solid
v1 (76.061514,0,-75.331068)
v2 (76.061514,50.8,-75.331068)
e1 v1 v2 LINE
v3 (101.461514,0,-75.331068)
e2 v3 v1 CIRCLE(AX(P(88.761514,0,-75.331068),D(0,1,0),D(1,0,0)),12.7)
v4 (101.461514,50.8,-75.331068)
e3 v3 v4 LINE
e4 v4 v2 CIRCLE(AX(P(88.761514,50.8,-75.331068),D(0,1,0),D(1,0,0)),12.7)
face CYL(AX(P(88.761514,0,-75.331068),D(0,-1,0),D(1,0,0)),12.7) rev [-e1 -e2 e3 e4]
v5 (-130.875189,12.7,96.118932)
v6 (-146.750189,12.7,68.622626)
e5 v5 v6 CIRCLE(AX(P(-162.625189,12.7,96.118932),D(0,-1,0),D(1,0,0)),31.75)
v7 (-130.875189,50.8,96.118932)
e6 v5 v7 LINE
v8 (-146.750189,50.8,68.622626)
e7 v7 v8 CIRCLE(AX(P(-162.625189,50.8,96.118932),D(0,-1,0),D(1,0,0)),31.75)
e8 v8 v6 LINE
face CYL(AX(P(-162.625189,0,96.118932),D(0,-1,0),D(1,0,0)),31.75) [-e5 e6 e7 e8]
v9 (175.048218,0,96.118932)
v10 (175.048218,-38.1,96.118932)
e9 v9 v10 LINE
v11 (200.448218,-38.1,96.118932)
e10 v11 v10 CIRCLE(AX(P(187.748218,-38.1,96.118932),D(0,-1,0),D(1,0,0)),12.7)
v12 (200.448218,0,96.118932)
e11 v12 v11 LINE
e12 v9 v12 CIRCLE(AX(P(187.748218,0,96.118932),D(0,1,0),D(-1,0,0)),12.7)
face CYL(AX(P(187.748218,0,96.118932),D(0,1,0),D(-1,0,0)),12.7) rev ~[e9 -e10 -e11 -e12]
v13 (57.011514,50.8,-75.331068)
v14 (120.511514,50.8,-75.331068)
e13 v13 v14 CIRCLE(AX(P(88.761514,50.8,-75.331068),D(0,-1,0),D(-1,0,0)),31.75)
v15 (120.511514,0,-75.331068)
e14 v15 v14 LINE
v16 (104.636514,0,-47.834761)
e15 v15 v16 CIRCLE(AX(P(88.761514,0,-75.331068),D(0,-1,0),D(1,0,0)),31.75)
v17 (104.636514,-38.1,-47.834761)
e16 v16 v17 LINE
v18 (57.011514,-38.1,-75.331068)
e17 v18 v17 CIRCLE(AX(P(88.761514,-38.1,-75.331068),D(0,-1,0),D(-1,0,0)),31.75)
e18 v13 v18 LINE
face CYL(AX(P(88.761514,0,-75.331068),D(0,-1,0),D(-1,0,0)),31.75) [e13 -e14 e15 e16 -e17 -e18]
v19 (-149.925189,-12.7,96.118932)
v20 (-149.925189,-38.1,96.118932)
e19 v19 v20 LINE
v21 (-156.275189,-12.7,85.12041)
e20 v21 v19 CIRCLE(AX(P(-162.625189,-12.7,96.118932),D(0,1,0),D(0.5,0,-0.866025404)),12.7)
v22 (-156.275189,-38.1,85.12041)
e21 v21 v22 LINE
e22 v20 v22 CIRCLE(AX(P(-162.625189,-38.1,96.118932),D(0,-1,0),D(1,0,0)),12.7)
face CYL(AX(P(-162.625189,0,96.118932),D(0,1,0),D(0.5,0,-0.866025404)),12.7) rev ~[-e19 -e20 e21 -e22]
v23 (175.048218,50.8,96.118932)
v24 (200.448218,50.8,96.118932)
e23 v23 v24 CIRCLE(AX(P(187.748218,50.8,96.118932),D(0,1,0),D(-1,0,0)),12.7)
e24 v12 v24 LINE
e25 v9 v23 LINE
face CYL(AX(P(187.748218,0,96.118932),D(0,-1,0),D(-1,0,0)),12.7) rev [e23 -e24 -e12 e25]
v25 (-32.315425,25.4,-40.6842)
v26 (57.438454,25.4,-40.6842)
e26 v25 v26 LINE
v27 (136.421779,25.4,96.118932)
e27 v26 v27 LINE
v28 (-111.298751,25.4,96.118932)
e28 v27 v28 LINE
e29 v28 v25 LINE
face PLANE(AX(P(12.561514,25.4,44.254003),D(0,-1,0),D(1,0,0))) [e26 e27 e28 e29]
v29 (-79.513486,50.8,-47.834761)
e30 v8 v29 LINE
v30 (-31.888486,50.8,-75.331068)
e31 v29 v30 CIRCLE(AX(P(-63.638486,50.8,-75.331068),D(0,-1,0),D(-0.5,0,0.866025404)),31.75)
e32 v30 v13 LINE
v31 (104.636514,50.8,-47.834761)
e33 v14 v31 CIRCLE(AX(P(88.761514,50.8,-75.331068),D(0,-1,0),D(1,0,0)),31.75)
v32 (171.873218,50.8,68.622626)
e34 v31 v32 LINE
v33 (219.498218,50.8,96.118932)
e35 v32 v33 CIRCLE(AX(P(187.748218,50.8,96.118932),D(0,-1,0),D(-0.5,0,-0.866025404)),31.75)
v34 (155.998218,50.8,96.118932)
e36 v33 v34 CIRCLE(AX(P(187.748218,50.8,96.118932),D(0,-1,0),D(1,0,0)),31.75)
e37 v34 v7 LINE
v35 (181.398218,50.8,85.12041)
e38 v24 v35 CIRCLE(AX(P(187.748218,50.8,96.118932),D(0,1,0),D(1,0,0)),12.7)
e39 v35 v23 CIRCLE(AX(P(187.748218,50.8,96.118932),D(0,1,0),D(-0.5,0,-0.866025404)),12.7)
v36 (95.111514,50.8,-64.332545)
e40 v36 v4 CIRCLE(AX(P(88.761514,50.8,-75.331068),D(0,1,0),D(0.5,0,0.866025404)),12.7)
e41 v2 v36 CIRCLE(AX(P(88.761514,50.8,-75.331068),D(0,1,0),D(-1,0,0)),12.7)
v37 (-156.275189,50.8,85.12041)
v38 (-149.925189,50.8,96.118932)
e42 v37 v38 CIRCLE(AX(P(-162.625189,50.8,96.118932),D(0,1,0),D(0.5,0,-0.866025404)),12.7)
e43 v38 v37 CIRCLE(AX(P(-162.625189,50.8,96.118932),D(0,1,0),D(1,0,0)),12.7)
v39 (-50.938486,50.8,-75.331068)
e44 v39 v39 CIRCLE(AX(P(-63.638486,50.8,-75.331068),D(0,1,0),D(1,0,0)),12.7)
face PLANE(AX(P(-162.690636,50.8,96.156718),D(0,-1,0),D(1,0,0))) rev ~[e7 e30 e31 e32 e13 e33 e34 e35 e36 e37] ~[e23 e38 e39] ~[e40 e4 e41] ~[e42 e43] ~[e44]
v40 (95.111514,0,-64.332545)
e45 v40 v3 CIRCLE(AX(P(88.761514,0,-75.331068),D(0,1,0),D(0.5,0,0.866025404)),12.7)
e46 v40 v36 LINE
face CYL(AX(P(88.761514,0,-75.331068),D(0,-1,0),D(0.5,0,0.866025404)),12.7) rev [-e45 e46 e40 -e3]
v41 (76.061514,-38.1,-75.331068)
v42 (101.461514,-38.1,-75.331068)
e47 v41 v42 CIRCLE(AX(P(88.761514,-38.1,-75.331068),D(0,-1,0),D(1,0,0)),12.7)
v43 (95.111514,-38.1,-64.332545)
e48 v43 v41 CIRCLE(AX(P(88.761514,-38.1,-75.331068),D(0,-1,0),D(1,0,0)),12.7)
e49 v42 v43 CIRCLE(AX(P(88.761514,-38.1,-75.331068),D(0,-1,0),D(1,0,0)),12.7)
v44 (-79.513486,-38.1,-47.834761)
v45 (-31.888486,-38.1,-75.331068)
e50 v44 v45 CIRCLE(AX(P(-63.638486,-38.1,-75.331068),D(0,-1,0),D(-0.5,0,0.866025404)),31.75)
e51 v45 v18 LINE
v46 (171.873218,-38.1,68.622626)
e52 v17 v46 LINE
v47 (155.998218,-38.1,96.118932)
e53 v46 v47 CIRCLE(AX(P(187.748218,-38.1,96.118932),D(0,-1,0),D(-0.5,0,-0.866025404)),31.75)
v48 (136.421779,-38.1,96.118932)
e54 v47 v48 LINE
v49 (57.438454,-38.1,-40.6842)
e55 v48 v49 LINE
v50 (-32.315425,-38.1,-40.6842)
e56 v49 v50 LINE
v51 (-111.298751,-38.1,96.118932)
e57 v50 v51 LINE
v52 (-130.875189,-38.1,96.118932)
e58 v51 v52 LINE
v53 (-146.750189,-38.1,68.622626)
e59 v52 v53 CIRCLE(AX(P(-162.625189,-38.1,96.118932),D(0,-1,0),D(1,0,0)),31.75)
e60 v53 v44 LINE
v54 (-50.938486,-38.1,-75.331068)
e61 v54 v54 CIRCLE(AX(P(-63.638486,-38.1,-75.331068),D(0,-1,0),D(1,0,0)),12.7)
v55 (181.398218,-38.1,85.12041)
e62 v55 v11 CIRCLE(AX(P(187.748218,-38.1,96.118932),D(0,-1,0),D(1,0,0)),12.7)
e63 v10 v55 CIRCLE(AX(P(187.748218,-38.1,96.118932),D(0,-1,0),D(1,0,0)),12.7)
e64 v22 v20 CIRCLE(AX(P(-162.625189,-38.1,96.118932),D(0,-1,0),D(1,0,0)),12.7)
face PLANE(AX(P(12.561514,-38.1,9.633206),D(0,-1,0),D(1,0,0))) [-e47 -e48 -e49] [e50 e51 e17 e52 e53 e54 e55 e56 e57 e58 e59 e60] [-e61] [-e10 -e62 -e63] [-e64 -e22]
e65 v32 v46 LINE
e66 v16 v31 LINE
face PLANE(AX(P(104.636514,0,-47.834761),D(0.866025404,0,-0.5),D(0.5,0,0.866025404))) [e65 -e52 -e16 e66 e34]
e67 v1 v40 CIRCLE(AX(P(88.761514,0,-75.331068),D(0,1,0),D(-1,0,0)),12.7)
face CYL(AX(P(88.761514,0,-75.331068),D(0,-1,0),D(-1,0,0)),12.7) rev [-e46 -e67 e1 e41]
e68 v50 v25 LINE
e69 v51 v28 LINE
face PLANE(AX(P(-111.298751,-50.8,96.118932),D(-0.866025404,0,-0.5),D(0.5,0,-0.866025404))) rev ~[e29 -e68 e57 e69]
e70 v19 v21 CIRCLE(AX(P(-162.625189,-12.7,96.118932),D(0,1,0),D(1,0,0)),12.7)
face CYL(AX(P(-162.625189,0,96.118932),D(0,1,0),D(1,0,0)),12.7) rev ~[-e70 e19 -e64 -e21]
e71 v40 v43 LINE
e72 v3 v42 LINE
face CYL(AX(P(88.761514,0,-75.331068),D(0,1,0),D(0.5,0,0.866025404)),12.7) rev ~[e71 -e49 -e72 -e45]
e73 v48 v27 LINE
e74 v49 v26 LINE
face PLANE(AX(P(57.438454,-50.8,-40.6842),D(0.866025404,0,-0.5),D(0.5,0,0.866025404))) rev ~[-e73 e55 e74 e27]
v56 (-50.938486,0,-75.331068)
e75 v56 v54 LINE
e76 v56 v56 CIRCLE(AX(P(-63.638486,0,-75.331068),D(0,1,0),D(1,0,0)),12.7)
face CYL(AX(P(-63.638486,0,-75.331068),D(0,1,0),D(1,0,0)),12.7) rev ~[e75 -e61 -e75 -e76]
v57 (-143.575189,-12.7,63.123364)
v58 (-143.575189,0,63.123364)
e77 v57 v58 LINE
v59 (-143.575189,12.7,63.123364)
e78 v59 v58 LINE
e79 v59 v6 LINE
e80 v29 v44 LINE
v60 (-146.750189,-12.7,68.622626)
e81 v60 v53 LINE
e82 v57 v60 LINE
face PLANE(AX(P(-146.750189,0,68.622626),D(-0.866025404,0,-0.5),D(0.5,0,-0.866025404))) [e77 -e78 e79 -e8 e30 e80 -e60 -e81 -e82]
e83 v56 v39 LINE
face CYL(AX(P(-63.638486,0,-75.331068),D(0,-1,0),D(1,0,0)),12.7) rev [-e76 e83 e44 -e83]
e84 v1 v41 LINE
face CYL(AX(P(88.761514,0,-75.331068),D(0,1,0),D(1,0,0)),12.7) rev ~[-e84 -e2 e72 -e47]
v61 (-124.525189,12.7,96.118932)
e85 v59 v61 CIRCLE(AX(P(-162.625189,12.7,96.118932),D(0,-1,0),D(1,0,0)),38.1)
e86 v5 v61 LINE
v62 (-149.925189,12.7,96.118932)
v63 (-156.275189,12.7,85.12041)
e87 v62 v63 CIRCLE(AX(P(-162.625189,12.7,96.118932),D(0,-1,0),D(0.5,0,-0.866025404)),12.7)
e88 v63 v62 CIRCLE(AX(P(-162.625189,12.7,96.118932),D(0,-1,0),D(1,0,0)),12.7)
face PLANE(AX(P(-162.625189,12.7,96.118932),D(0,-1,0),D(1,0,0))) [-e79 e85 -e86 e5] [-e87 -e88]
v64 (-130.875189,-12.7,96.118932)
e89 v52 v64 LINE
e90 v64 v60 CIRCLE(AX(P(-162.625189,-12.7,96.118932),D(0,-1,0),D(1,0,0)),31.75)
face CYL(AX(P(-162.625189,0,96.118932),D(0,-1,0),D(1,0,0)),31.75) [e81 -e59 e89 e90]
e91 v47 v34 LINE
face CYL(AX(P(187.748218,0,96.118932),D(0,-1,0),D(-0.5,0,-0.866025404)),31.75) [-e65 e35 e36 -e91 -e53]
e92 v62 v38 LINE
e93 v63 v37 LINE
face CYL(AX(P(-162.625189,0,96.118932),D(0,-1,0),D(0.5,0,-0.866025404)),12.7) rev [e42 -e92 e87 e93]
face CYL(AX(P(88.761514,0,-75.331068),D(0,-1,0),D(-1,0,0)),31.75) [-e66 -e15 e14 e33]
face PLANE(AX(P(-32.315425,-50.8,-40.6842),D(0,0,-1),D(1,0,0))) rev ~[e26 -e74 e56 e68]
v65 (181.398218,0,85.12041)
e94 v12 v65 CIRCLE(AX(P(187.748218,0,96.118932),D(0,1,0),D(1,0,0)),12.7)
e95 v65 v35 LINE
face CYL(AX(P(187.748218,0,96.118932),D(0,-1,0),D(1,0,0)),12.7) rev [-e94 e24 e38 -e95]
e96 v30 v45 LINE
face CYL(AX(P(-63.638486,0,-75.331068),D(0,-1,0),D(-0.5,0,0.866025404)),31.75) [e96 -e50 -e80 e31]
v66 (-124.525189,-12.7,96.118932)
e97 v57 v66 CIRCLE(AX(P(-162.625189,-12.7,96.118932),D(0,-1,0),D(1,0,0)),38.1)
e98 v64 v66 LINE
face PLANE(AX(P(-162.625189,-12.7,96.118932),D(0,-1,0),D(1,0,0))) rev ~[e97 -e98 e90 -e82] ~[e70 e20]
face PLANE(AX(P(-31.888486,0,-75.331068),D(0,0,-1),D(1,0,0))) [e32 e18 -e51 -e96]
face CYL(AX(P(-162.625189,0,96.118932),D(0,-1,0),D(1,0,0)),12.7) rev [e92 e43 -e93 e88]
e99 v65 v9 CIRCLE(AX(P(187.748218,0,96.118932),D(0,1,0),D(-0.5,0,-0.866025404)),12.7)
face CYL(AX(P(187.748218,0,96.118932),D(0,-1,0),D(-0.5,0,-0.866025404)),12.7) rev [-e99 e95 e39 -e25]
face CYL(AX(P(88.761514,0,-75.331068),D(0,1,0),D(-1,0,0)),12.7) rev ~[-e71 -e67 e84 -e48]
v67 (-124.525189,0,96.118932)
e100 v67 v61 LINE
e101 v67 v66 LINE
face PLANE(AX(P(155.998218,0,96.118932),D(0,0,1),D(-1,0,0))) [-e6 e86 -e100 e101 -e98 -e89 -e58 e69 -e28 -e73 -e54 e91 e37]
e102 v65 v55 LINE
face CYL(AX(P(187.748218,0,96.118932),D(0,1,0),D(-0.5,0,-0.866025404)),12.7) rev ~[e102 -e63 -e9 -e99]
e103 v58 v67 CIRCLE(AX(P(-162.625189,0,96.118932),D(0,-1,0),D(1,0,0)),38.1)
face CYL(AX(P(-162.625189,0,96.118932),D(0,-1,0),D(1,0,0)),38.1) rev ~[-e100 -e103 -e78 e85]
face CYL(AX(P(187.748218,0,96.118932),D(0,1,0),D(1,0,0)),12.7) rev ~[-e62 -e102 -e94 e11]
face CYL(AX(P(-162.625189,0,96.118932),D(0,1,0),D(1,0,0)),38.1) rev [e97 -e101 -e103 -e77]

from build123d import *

# Parameters (mm, degrees)
F1_DEPTH  = 50.8
F3_DEPTH  = 76.2
F4_R      = 38.1
F1_FACE_R = 12.7
F5_DEPTH  = 12.7


with BuildPart() as f1:
    # F0 (on Front) → F1 (new body, symmetric)
    with BuildSketch(Plane.XZ):
        with BuildLine():
            ThreePointArc((-130.8751894546, 96.1189323328), (-190.1214960247, 111.9939323328), (-146.7501894546, 68.6226257627))
            Line((-146.7501894546, 68.6226257627), (-156.2751894546, 85.1204097048))
            ThreePointArc((-156.2751894546, 85.1204097048), (-173.6237120826, 102.4689323328), (-149.9251894546, 96.1189323328))
            Line((-149.9251894546, 96.1189323328), (-130.8751894546, 96.1189323328))
        make_face()
        with BuildLine():
            Line((-156.2751894546, 85.1204097048), (-146.7501894546, 68.6226257627))
            ThreePointArc((-146.7501894546, 68.6226257627), (-135.1288828844, 80.2439323328), (-130.8751894546, 96.1189323328))
            Line((-130.8751894546, 96.1189323328), (-149.9251894546, 96.1189323328))
            ThreePointArc((-149.9251894546, 96.1189323328), (-151.6266668265, 89.7689323328), (-156.2751894546, 85.1204097048))
        make_face()
        with BuildLine():
            Line((181.3982178505, 85.1204097048), (171.8732178505, 68.6226257627))
            ThreePointArc((171.8732178505, 68.6226257627), (203.6232178505, 68.6226257627), (219.4982178505, 96.1189323328))
            ThreePointArc((219.4982178505, 96.1189323328), (187.7482178505, 127.8689323328), (155.9982178505, 96.1189323328))
            Line((155.9982178505, 96.1189323328), (175.0482178505, 96.1189323328))
            ThreePointArc((175.0482178505, 96.1189323328), (187.7482178505, 108.8189323328), (200.4482178505, 96.1189323328))
            ThreePointArc((200.4482178505, 96.1189323328), (194.0982178505, 85.1204097048), (181.3982178505, 85.1204097048))
        make_face()
        with BuildLine():
            ThreePointArc((-79.513485802, -47.834761097), (-47.763485802, -47.834761097), (-31.888485802, -75.3310676672))
            Line((-31.888485802, -75.3310676672), (57.011514198, -75.3310676672))
            ThreePointArc((57.011514198, -75.3310676672), (72.886514198, -47.834761097), (104.636514198, -47.834761097))
            Line((104.636514198, -47.834761097), (171.8732178505, 68.6226257627))
            ThreePointArc((171.8732178505, 68.6226257627), (160.2519112804, 80.2439323328), (155.9982178505, 96.1189323328))
            Line((155.9982178505, 96.1189323328), (-130.8751894546, 96.1189323328))
            ThreePointArc((-130.8751894546, 96.1189323328), (-135.1288828844, 80.2439323328), (-146.7501894546, 68.6226257627))
            Line((-146.7501894546, 68.6226257627), (-79.513485802, -47.834761097))
        make_face()
        with BuildLine():
            Line((76.061514198, -75.3310676672), (57.011514198, -75.3310676672))
            ThreePointArc((57.011514198, -75.3310676672), (88.761514198, -107.0810676672), (120.511514198, -75.3310676672))
            ThreePointArc((120.511514198, -75.3310676672), (116.2578207681, -59.4560676672), (104.636514198, -47.834761097))
            Line((104.636514198, -47.834761097), (95.111514198, -64.3325450391))
            ThreePointArc((95.111514198, -64.3325450391), (99.760036826, -68.9810676672), (101.461514198, -75.3310676672))
            ThreePointArc((101.461514198, -75.3310676672), (88.761514198, -88.0310676672), (76.061514198, -75.3310676672))
        make_face()
        with BuildLine():
            ThreePointArc((104.636514198, -47.834761097), (72.886514198, -47.834761097), (57.011514198, -75.3310676672))
            Line((57.011514198, -75.3310676672), (76.061514198, -75.3310676672))
            ThreePointArc((76.061514198, -75.3310676672), (82.411514198, -64.3325450391), (95.111514198, -64.3325450391))
            Line((95.111514198, -64.3325450391), (104.636514198, -47.834761097))
        make_face()
        with BuildLine():
            Line((-31.888485802, -75.3310676672), (-50.938485802, -75.3310676672))
            ThreePointArc((-50.938485802, -75.3310676672), (-69.988485802, -86.3295902952), (-69.988485802, -64.3325450391))
            Line((-69.988485802, -64.3325450391), (-79.513485802, -47.834761097))
            ThreePointArc((-79.513485802, -47.834761097), (-79.513485802, -102.8273742373), (-31.888485802, -75.3310676672))
        make_face()
        with BuildLine():
            ThreePointArc((-69.988485802, -64.3325450391), (-57.288485802, -64.3325450391), (-50.938485802, -75.3310676672))
            Line((-50.938485802, -75.3310676672), (-31.888485802, -75.3310676672))
            ThreePointArc((-31.888485802, -75.3310676672), (-47.763485802, -47.834761097), (-79.513485802, -47.834761097))
            Line((-79.513485802, -47.834761097), (-69.988485802, -64.3325450391))
        make_face()
        with BuildLine():
            ThreePointArc((155.9982178505, 96.1189323328), (160.2519112804, 80.2439323328), (171.8732178505, 68.6226257627))
            Line((171.8732178505, 68.6226257627), (181.3982178505, 85.1204097048))
            ThreePointArc((181.3982178505, 85.1204097048), (176.7496952225, 89.7689323328), (175.0482178505, 96.1189323328))
            Line((175.0482178505, 96.1189323328), (155.9982178505, 96.1189323328))
        make_face()
    extrude(amount=F1_DEPTH, both=True)

    # F2 (on face) → F3 (cut)
    with BuildSketch(Plane.XZ.offset(50.8)):
        Polygon((136.4217789196, 96.1189323328), (-111.2987505236, 96.1189323328), (-32.3154252183, -40.6842000468), (57.4384536142, -40.6842000468), align=None)
    extrude(amount=-F3_DEPTH, mode=Mode.SUBTRACT)

    # F4 (on Front) + F1_face (on face) → F5 (cut, symmetric)
    with BuildSketch(Plane.XZ):
        with Locations((-162.6251894546, 96.1189323328)):
            Circle(F4_R)
    with BuildSketch(Plane(origin=(12.561514198, -50.8, 21.3503423812), x_dir=(1, 0, 0), z_dir=(0, -1, 0))):
        with BuildLine():
            Line((-123.8602647216, 74.7685899517), (-143.4367036526, 74.7685899517))
            ThreePointArc((-143.4367036526, 74.7685899517), (-202.6830102227, 90.6435899517), (-159.3117036526, 47.2722833815))
            Line((-159.3117036526, 47.2722833815), (-92.075, -69.1851034782))
            ThreePointArc((-92.075, -69.1851034782), (-92.075, -124.1777166185), (-44.45, -96.6814100483))
            Line((-44.45, -96.6814100483), (44.45, -96.6814100483))
            ThreePointArc((44.45, -96.6814100483), (92.075, -124.1777166185), (92.075, -69.1851034782))
            Line((92.075, -69.1851034782), (159.3117036526, 47.2722833815))
            ThreePointArc((159.3117036526, 47.2722833815), (202.6830102227, 90.6435899517), (143.4367036526, 74.7685899517))
            Line((143.4367036526, 74.7685899517), (123.8602647216, 74.7685899517))
            Line((123.8602647216, 74.7685899517), (44.8769394163, -62.0345424279))
            Line((44.8769394163, -62.0345424279), (-44.8769394163, -62.0345424279))
            Line((-44.8769394163, -62.0345424279), (-123.8602647216, 74.7685899517))
        make_face()
        with Locations((-76.2, -96.6814100483)):
            Circle(F1_FACE_R, mode=Mode.SUBTRACT)
        with Locations((76.2, -96.6814100483)):
            Circle(F1_FACE_R, mode=Mode.SUBTRACT)
        with Locations((-175.1867036526, 74.7685899517)):
            Circle(F1_FACE_R, mode=Mode.SUBTRACT)
        with Locations((175.1867036526, 74.7685899517)):
            Circle(F1_FACE_R, mode=Mode.SUBTRACT)
    extrude(amount=F5_DEPTH, both=True, mode=Mode.SUBTRACT)


solid = f1.part
